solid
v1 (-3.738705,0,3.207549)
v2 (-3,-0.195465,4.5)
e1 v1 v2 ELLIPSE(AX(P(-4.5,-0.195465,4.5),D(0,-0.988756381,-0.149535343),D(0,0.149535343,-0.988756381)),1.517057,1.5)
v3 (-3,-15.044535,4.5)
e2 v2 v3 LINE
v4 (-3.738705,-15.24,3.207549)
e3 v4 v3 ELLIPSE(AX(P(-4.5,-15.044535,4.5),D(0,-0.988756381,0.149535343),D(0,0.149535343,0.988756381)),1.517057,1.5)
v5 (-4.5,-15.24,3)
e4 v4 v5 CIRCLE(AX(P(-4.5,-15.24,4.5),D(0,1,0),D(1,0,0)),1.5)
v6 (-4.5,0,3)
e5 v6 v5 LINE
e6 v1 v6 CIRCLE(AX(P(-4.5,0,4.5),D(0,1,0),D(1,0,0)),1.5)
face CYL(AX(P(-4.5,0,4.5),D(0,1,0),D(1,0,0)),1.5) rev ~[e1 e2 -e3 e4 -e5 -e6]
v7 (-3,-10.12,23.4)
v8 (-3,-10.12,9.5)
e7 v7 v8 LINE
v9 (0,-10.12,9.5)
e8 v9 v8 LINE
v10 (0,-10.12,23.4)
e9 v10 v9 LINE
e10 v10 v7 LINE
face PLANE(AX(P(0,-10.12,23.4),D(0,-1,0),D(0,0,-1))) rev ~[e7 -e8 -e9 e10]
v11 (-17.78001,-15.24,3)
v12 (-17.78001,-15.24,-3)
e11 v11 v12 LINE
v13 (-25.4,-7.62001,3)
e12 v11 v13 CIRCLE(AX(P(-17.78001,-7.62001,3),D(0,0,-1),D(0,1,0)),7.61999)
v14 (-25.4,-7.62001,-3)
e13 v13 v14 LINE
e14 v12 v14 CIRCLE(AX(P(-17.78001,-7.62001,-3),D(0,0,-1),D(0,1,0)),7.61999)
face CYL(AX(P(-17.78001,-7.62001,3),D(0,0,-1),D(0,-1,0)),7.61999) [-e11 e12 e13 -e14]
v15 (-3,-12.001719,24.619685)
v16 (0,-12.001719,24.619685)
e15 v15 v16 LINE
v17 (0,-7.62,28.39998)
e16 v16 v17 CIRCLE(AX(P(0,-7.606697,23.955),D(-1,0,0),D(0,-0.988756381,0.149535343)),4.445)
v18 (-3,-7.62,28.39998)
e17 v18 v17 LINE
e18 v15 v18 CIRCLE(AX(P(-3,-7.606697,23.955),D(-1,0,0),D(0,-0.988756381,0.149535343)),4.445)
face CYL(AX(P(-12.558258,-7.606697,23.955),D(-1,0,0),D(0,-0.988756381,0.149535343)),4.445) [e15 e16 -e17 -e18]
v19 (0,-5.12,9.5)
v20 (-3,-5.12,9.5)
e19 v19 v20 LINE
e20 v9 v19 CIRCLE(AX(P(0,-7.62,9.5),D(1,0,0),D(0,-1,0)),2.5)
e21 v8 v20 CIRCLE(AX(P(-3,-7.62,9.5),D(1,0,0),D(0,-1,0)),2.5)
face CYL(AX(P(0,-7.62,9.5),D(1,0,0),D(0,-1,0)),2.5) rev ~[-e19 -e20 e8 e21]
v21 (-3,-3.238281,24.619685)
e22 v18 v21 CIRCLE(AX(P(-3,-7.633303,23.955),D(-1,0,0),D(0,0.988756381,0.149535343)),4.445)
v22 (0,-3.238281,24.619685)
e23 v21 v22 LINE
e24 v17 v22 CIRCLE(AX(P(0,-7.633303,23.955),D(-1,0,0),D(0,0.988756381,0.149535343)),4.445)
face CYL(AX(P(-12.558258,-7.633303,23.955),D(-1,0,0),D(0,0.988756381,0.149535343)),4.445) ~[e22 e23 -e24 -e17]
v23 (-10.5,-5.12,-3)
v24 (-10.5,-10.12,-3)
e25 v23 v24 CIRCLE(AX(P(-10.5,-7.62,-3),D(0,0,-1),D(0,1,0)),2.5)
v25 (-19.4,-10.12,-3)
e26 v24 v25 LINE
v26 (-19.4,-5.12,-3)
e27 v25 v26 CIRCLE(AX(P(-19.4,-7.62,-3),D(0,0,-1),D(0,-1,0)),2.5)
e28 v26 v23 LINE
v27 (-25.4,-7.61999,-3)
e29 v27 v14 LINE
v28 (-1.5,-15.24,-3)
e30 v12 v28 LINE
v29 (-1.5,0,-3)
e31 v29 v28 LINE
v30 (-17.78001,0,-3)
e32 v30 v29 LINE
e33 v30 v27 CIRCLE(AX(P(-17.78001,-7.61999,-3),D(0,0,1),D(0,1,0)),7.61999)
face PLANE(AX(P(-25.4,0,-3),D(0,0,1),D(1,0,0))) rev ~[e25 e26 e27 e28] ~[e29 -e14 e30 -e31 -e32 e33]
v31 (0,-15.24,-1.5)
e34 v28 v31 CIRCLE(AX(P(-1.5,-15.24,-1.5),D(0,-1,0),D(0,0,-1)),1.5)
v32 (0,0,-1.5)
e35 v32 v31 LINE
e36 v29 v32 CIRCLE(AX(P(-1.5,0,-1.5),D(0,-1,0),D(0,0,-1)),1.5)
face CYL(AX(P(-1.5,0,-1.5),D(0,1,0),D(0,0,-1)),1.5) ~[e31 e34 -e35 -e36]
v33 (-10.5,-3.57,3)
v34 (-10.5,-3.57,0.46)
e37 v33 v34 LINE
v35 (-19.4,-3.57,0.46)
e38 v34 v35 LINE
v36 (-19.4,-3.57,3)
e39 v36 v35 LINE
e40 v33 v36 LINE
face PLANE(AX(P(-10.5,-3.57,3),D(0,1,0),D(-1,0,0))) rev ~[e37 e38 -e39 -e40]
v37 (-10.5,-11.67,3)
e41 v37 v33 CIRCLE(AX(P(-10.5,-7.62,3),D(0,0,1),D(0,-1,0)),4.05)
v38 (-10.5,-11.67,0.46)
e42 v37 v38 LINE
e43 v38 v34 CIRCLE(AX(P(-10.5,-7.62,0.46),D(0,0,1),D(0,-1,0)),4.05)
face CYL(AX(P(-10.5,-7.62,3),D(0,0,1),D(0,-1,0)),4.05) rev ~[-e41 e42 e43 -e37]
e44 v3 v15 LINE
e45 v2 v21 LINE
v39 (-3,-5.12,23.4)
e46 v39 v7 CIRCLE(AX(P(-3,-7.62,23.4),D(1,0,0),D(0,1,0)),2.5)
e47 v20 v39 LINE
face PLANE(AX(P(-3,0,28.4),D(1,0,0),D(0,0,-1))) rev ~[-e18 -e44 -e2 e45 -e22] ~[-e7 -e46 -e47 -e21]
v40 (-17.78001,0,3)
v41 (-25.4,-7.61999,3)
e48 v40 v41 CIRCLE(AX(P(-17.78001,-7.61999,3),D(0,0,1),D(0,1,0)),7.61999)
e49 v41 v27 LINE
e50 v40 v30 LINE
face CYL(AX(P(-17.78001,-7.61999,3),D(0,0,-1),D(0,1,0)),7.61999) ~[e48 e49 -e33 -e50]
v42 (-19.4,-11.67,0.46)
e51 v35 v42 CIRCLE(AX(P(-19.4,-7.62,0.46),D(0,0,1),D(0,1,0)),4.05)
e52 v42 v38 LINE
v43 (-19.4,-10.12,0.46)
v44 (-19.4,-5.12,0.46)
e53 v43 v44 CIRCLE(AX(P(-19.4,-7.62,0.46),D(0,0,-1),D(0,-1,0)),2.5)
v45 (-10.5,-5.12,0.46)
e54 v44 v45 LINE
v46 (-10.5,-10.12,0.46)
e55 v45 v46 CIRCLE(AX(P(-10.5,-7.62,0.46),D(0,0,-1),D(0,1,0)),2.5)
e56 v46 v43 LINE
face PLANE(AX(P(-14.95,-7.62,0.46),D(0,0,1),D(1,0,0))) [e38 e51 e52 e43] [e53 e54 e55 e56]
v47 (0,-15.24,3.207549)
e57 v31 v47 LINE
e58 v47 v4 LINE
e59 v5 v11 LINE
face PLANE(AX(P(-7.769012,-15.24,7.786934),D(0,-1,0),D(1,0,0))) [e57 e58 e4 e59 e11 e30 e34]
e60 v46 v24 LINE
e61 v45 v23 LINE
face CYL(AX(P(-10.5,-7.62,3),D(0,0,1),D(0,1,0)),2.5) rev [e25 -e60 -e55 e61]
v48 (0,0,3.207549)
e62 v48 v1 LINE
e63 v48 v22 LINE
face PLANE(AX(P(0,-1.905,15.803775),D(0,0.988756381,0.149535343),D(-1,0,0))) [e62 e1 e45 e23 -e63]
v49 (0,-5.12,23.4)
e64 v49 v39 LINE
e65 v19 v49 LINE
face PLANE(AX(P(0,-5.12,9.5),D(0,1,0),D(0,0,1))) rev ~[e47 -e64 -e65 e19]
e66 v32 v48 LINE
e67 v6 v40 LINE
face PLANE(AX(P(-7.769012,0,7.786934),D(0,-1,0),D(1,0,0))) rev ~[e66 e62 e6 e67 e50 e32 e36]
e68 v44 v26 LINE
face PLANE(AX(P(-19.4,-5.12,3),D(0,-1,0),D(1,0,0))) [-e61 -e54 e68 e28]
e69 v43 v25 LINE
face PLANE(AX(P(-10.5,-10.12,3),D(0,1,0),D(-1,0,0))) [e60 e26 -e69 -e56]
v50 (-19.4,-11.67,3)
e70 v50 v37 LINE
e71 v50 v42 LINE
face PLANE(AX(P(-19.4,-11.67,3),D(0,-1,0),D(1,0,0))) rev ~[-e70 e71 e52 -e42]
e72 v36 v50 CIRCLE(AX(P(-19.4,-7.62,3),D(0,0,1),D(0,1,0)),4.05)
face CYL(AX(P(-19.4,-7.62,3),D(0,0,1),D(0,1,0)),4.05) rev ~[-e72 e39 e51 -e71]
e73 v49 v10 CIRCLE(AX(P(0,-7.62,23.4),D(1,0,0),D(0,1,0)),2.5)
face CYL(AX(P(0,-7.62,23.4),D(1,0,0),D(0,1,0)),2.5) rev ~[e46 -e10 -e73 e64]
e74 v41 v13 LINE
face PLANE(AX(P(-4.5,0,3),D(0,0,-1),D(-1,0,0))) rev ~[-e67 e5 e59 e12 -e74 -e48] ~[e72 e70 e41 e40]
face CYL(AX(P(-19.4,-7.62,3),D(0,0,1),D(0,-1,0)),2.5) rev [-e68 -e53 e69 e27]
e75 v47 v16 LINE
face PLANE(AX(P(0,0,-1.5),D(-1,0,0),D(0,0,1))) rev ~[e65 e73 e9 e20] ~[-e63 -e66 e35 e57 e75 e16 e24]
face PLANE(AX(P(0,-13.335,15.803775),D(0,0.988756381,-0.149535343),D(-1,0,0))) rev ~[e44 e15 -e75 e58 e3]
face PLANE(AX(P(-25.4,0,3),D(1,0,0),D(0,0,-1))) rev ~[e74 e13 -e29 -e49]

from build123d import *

# Parameters (mm, degrees)
F1_DEPTH    = 15.24
F3_DEPTH    = 3
F5_DEPTH    = 2.54
F6_DEPTH    = 6
F7_C1_SIZE2 = 3.81
F7_C1_SIZE  = 25.1924509954
F7_C2_SIZE2 = 3.81
F7_C2_SIZE  = 25.1924509954
F8_T1_DEPTH = 22.1165158115
F9_R        = 7.61999


# Not quite as in the source:
# - a fillet or chamfer that OpenCascade refuses, or shapes differently, is made with other operations: its cross-section is extruded or revolved along the edge and cut away or added
# - a fillet or chamfer is up to 0.001 mm smaller than in the source, because OpenCascade refuses the exact size


with BuildPart() as f1:
    # F0 (on Front) → F1 (new body)
    with BuildSketch(Plane.XZ):
        with BuildLine():
            ThreePointArc((-3, 4.5), (-3.4393398282, 3.4393398282), (-4.5, 3))
            Line((-4.5, 3), (-25.4, 3))
            Line((-25.4, 3), (-25.4, -3))
            Line((-25.4, -3), (-1.5, -3))
            ThreePointArc((-1.5, -3), (-0.4393398282, -2.5606601718), (0, -1.5))
            Line((0, -1.5), (0, 28.4))
            Line((0, 28.4), (-3, 28.4))
            Line((-3, 28.4), (-3, 4.5))
        make_face()
    extrude(amount=F1_DEPTH)

    # F2 (on face) → F3 (cut, through all)
    with BuildSketch(Plane.YZ):
        with BuildLine():
            ThreePointArc((-5.12, 23.4), (-7.62, 25.9), (-10.12, 23.4))
            Line((-10.12, 23.4), (-10.12, 9.5))
            ThreePointArc((-10.12, 9.5), (-7.62, 7), (-5.12, 9.5))
            Line((-5.12, 9.5), (-5.12, 23.4))
        make_face()
    extrude(amount=-F3_DEPTH, mode=Mode.SUBTRACT)

    # F4 (on face) → F5 (cut)
    with BuildSketch(Plane.XY.offset(3)):
        with BuildLine():
            ThreePointArc((-19.4, -3.57), (-23.45, -7.62), (-19.4, -11.67))
            Line((-19.4, -11.67), (-10.5, -11.67))
            ThreePointArc((-10.5, -11.67), (-6.45, -7.62), (-10.5, -3.57))
            Line((-10.5, -3.57), (-19.4, -3.57))
        make_face()
        with BuildLine():
            Line((-10.5, -10.12), (-19.4, -10.12))
            ThreePointArc((-19.4, -10.12), (-21.9, -7.62), (-19.4, -5.12))
            Line((-19.4, -5.12), (-10.5, -5.12))
            ThreePointArc((-10.5, -5.12), (-8, -7.62), (-10.5, -10.12))
        make_face(mode=Mode.SUBTRACT)
    extrude(amount=-F5_DEPTH, mode=Mode.SUBTRACT)

    # F6 (cut, through all): a face of the model
    f6_faces = [f1.faces().sort_by_distance(p)[0] for p in [
        (-14.95, -7.62, 3),
    ]]
    extrude(f6_faces, amount=-F6_DEPTH, mode=Mode.SUBTRACT)

    # F7: chamfer of 3.81 x 25.1924509954 on 2 edges, made by hand

    # F7_c1
    f7_c1_edges = [f1.edges().sort_by_distance(p)[0] for p in [
        (-1.5, 0, 28.4),
    ]]
    f7_c1_side = f1.faces().sort_by_distance((-1.5, 0, 28.3238))[0]
    chamfer(f7_c1_edges, length=F7_C1_SIZE, length2=F7_C1_SIZE2, reference=f7_c1_side)

    # F7_c2
    f7_c2_edges = [f1.edges().sort_by_distance(p)[0] for p in [
        (-1.5, -15.24, 28.4),
    ]]
    f7_c2_side = f1.faces().sort_by_distance((-1.5, -15.24, 28.3238))[0]
    chamfer(f7_c2_edges, length=F7_C2_SIZE, length2=F7_C2_SIZE2, reference=f7_c2_side)

    # F8: fillet of radius 4.445 on 2 edges, made by hand

    # F8_s2 → F8_t1 (cut)
    with BuildSketch(Plane.YZ.offset(-12.5582579057)):
        with BuildLine():
            ThreePointArc((-12.0017189515, 24.6196846016), (-10.5052742427, 27.3249071244), (-7.6066968377, 28.4))
            Line((-7.6066968377, 28.4), (-11.43, 28.4))
            Line((-11.43, 28.4), (-12.0017189515, 24.6196846016))
        make_face()
        with BuildLine():
            ThreePointArc((-3.2382810485, 24.6196846016), (-4.7347257573, 27.3249071244), (-7.6333031623, 28.4))
            Line((-7.6333031623, 28.4), (-3.81, 28.4))
            Line((-3.81, 28.4), (-3.2382810485, 24.6196846016))
        make_face()
    extrude(amount=F8_T1_DEPTH, mode=Mode.SUBTRACT)

    # F9 (radius 7.62 in the source; OpenCascade refuses exactly that, so slightly less here)
    f9_edges = [f1.edges().sort_by_distance(p)[0] for p in [
        (-25.4, -15.24, 0),
        (-25.4, 0, 0),
    ]]
    fillet(f9_edges, radius=F9_R)


solid = f1.part
